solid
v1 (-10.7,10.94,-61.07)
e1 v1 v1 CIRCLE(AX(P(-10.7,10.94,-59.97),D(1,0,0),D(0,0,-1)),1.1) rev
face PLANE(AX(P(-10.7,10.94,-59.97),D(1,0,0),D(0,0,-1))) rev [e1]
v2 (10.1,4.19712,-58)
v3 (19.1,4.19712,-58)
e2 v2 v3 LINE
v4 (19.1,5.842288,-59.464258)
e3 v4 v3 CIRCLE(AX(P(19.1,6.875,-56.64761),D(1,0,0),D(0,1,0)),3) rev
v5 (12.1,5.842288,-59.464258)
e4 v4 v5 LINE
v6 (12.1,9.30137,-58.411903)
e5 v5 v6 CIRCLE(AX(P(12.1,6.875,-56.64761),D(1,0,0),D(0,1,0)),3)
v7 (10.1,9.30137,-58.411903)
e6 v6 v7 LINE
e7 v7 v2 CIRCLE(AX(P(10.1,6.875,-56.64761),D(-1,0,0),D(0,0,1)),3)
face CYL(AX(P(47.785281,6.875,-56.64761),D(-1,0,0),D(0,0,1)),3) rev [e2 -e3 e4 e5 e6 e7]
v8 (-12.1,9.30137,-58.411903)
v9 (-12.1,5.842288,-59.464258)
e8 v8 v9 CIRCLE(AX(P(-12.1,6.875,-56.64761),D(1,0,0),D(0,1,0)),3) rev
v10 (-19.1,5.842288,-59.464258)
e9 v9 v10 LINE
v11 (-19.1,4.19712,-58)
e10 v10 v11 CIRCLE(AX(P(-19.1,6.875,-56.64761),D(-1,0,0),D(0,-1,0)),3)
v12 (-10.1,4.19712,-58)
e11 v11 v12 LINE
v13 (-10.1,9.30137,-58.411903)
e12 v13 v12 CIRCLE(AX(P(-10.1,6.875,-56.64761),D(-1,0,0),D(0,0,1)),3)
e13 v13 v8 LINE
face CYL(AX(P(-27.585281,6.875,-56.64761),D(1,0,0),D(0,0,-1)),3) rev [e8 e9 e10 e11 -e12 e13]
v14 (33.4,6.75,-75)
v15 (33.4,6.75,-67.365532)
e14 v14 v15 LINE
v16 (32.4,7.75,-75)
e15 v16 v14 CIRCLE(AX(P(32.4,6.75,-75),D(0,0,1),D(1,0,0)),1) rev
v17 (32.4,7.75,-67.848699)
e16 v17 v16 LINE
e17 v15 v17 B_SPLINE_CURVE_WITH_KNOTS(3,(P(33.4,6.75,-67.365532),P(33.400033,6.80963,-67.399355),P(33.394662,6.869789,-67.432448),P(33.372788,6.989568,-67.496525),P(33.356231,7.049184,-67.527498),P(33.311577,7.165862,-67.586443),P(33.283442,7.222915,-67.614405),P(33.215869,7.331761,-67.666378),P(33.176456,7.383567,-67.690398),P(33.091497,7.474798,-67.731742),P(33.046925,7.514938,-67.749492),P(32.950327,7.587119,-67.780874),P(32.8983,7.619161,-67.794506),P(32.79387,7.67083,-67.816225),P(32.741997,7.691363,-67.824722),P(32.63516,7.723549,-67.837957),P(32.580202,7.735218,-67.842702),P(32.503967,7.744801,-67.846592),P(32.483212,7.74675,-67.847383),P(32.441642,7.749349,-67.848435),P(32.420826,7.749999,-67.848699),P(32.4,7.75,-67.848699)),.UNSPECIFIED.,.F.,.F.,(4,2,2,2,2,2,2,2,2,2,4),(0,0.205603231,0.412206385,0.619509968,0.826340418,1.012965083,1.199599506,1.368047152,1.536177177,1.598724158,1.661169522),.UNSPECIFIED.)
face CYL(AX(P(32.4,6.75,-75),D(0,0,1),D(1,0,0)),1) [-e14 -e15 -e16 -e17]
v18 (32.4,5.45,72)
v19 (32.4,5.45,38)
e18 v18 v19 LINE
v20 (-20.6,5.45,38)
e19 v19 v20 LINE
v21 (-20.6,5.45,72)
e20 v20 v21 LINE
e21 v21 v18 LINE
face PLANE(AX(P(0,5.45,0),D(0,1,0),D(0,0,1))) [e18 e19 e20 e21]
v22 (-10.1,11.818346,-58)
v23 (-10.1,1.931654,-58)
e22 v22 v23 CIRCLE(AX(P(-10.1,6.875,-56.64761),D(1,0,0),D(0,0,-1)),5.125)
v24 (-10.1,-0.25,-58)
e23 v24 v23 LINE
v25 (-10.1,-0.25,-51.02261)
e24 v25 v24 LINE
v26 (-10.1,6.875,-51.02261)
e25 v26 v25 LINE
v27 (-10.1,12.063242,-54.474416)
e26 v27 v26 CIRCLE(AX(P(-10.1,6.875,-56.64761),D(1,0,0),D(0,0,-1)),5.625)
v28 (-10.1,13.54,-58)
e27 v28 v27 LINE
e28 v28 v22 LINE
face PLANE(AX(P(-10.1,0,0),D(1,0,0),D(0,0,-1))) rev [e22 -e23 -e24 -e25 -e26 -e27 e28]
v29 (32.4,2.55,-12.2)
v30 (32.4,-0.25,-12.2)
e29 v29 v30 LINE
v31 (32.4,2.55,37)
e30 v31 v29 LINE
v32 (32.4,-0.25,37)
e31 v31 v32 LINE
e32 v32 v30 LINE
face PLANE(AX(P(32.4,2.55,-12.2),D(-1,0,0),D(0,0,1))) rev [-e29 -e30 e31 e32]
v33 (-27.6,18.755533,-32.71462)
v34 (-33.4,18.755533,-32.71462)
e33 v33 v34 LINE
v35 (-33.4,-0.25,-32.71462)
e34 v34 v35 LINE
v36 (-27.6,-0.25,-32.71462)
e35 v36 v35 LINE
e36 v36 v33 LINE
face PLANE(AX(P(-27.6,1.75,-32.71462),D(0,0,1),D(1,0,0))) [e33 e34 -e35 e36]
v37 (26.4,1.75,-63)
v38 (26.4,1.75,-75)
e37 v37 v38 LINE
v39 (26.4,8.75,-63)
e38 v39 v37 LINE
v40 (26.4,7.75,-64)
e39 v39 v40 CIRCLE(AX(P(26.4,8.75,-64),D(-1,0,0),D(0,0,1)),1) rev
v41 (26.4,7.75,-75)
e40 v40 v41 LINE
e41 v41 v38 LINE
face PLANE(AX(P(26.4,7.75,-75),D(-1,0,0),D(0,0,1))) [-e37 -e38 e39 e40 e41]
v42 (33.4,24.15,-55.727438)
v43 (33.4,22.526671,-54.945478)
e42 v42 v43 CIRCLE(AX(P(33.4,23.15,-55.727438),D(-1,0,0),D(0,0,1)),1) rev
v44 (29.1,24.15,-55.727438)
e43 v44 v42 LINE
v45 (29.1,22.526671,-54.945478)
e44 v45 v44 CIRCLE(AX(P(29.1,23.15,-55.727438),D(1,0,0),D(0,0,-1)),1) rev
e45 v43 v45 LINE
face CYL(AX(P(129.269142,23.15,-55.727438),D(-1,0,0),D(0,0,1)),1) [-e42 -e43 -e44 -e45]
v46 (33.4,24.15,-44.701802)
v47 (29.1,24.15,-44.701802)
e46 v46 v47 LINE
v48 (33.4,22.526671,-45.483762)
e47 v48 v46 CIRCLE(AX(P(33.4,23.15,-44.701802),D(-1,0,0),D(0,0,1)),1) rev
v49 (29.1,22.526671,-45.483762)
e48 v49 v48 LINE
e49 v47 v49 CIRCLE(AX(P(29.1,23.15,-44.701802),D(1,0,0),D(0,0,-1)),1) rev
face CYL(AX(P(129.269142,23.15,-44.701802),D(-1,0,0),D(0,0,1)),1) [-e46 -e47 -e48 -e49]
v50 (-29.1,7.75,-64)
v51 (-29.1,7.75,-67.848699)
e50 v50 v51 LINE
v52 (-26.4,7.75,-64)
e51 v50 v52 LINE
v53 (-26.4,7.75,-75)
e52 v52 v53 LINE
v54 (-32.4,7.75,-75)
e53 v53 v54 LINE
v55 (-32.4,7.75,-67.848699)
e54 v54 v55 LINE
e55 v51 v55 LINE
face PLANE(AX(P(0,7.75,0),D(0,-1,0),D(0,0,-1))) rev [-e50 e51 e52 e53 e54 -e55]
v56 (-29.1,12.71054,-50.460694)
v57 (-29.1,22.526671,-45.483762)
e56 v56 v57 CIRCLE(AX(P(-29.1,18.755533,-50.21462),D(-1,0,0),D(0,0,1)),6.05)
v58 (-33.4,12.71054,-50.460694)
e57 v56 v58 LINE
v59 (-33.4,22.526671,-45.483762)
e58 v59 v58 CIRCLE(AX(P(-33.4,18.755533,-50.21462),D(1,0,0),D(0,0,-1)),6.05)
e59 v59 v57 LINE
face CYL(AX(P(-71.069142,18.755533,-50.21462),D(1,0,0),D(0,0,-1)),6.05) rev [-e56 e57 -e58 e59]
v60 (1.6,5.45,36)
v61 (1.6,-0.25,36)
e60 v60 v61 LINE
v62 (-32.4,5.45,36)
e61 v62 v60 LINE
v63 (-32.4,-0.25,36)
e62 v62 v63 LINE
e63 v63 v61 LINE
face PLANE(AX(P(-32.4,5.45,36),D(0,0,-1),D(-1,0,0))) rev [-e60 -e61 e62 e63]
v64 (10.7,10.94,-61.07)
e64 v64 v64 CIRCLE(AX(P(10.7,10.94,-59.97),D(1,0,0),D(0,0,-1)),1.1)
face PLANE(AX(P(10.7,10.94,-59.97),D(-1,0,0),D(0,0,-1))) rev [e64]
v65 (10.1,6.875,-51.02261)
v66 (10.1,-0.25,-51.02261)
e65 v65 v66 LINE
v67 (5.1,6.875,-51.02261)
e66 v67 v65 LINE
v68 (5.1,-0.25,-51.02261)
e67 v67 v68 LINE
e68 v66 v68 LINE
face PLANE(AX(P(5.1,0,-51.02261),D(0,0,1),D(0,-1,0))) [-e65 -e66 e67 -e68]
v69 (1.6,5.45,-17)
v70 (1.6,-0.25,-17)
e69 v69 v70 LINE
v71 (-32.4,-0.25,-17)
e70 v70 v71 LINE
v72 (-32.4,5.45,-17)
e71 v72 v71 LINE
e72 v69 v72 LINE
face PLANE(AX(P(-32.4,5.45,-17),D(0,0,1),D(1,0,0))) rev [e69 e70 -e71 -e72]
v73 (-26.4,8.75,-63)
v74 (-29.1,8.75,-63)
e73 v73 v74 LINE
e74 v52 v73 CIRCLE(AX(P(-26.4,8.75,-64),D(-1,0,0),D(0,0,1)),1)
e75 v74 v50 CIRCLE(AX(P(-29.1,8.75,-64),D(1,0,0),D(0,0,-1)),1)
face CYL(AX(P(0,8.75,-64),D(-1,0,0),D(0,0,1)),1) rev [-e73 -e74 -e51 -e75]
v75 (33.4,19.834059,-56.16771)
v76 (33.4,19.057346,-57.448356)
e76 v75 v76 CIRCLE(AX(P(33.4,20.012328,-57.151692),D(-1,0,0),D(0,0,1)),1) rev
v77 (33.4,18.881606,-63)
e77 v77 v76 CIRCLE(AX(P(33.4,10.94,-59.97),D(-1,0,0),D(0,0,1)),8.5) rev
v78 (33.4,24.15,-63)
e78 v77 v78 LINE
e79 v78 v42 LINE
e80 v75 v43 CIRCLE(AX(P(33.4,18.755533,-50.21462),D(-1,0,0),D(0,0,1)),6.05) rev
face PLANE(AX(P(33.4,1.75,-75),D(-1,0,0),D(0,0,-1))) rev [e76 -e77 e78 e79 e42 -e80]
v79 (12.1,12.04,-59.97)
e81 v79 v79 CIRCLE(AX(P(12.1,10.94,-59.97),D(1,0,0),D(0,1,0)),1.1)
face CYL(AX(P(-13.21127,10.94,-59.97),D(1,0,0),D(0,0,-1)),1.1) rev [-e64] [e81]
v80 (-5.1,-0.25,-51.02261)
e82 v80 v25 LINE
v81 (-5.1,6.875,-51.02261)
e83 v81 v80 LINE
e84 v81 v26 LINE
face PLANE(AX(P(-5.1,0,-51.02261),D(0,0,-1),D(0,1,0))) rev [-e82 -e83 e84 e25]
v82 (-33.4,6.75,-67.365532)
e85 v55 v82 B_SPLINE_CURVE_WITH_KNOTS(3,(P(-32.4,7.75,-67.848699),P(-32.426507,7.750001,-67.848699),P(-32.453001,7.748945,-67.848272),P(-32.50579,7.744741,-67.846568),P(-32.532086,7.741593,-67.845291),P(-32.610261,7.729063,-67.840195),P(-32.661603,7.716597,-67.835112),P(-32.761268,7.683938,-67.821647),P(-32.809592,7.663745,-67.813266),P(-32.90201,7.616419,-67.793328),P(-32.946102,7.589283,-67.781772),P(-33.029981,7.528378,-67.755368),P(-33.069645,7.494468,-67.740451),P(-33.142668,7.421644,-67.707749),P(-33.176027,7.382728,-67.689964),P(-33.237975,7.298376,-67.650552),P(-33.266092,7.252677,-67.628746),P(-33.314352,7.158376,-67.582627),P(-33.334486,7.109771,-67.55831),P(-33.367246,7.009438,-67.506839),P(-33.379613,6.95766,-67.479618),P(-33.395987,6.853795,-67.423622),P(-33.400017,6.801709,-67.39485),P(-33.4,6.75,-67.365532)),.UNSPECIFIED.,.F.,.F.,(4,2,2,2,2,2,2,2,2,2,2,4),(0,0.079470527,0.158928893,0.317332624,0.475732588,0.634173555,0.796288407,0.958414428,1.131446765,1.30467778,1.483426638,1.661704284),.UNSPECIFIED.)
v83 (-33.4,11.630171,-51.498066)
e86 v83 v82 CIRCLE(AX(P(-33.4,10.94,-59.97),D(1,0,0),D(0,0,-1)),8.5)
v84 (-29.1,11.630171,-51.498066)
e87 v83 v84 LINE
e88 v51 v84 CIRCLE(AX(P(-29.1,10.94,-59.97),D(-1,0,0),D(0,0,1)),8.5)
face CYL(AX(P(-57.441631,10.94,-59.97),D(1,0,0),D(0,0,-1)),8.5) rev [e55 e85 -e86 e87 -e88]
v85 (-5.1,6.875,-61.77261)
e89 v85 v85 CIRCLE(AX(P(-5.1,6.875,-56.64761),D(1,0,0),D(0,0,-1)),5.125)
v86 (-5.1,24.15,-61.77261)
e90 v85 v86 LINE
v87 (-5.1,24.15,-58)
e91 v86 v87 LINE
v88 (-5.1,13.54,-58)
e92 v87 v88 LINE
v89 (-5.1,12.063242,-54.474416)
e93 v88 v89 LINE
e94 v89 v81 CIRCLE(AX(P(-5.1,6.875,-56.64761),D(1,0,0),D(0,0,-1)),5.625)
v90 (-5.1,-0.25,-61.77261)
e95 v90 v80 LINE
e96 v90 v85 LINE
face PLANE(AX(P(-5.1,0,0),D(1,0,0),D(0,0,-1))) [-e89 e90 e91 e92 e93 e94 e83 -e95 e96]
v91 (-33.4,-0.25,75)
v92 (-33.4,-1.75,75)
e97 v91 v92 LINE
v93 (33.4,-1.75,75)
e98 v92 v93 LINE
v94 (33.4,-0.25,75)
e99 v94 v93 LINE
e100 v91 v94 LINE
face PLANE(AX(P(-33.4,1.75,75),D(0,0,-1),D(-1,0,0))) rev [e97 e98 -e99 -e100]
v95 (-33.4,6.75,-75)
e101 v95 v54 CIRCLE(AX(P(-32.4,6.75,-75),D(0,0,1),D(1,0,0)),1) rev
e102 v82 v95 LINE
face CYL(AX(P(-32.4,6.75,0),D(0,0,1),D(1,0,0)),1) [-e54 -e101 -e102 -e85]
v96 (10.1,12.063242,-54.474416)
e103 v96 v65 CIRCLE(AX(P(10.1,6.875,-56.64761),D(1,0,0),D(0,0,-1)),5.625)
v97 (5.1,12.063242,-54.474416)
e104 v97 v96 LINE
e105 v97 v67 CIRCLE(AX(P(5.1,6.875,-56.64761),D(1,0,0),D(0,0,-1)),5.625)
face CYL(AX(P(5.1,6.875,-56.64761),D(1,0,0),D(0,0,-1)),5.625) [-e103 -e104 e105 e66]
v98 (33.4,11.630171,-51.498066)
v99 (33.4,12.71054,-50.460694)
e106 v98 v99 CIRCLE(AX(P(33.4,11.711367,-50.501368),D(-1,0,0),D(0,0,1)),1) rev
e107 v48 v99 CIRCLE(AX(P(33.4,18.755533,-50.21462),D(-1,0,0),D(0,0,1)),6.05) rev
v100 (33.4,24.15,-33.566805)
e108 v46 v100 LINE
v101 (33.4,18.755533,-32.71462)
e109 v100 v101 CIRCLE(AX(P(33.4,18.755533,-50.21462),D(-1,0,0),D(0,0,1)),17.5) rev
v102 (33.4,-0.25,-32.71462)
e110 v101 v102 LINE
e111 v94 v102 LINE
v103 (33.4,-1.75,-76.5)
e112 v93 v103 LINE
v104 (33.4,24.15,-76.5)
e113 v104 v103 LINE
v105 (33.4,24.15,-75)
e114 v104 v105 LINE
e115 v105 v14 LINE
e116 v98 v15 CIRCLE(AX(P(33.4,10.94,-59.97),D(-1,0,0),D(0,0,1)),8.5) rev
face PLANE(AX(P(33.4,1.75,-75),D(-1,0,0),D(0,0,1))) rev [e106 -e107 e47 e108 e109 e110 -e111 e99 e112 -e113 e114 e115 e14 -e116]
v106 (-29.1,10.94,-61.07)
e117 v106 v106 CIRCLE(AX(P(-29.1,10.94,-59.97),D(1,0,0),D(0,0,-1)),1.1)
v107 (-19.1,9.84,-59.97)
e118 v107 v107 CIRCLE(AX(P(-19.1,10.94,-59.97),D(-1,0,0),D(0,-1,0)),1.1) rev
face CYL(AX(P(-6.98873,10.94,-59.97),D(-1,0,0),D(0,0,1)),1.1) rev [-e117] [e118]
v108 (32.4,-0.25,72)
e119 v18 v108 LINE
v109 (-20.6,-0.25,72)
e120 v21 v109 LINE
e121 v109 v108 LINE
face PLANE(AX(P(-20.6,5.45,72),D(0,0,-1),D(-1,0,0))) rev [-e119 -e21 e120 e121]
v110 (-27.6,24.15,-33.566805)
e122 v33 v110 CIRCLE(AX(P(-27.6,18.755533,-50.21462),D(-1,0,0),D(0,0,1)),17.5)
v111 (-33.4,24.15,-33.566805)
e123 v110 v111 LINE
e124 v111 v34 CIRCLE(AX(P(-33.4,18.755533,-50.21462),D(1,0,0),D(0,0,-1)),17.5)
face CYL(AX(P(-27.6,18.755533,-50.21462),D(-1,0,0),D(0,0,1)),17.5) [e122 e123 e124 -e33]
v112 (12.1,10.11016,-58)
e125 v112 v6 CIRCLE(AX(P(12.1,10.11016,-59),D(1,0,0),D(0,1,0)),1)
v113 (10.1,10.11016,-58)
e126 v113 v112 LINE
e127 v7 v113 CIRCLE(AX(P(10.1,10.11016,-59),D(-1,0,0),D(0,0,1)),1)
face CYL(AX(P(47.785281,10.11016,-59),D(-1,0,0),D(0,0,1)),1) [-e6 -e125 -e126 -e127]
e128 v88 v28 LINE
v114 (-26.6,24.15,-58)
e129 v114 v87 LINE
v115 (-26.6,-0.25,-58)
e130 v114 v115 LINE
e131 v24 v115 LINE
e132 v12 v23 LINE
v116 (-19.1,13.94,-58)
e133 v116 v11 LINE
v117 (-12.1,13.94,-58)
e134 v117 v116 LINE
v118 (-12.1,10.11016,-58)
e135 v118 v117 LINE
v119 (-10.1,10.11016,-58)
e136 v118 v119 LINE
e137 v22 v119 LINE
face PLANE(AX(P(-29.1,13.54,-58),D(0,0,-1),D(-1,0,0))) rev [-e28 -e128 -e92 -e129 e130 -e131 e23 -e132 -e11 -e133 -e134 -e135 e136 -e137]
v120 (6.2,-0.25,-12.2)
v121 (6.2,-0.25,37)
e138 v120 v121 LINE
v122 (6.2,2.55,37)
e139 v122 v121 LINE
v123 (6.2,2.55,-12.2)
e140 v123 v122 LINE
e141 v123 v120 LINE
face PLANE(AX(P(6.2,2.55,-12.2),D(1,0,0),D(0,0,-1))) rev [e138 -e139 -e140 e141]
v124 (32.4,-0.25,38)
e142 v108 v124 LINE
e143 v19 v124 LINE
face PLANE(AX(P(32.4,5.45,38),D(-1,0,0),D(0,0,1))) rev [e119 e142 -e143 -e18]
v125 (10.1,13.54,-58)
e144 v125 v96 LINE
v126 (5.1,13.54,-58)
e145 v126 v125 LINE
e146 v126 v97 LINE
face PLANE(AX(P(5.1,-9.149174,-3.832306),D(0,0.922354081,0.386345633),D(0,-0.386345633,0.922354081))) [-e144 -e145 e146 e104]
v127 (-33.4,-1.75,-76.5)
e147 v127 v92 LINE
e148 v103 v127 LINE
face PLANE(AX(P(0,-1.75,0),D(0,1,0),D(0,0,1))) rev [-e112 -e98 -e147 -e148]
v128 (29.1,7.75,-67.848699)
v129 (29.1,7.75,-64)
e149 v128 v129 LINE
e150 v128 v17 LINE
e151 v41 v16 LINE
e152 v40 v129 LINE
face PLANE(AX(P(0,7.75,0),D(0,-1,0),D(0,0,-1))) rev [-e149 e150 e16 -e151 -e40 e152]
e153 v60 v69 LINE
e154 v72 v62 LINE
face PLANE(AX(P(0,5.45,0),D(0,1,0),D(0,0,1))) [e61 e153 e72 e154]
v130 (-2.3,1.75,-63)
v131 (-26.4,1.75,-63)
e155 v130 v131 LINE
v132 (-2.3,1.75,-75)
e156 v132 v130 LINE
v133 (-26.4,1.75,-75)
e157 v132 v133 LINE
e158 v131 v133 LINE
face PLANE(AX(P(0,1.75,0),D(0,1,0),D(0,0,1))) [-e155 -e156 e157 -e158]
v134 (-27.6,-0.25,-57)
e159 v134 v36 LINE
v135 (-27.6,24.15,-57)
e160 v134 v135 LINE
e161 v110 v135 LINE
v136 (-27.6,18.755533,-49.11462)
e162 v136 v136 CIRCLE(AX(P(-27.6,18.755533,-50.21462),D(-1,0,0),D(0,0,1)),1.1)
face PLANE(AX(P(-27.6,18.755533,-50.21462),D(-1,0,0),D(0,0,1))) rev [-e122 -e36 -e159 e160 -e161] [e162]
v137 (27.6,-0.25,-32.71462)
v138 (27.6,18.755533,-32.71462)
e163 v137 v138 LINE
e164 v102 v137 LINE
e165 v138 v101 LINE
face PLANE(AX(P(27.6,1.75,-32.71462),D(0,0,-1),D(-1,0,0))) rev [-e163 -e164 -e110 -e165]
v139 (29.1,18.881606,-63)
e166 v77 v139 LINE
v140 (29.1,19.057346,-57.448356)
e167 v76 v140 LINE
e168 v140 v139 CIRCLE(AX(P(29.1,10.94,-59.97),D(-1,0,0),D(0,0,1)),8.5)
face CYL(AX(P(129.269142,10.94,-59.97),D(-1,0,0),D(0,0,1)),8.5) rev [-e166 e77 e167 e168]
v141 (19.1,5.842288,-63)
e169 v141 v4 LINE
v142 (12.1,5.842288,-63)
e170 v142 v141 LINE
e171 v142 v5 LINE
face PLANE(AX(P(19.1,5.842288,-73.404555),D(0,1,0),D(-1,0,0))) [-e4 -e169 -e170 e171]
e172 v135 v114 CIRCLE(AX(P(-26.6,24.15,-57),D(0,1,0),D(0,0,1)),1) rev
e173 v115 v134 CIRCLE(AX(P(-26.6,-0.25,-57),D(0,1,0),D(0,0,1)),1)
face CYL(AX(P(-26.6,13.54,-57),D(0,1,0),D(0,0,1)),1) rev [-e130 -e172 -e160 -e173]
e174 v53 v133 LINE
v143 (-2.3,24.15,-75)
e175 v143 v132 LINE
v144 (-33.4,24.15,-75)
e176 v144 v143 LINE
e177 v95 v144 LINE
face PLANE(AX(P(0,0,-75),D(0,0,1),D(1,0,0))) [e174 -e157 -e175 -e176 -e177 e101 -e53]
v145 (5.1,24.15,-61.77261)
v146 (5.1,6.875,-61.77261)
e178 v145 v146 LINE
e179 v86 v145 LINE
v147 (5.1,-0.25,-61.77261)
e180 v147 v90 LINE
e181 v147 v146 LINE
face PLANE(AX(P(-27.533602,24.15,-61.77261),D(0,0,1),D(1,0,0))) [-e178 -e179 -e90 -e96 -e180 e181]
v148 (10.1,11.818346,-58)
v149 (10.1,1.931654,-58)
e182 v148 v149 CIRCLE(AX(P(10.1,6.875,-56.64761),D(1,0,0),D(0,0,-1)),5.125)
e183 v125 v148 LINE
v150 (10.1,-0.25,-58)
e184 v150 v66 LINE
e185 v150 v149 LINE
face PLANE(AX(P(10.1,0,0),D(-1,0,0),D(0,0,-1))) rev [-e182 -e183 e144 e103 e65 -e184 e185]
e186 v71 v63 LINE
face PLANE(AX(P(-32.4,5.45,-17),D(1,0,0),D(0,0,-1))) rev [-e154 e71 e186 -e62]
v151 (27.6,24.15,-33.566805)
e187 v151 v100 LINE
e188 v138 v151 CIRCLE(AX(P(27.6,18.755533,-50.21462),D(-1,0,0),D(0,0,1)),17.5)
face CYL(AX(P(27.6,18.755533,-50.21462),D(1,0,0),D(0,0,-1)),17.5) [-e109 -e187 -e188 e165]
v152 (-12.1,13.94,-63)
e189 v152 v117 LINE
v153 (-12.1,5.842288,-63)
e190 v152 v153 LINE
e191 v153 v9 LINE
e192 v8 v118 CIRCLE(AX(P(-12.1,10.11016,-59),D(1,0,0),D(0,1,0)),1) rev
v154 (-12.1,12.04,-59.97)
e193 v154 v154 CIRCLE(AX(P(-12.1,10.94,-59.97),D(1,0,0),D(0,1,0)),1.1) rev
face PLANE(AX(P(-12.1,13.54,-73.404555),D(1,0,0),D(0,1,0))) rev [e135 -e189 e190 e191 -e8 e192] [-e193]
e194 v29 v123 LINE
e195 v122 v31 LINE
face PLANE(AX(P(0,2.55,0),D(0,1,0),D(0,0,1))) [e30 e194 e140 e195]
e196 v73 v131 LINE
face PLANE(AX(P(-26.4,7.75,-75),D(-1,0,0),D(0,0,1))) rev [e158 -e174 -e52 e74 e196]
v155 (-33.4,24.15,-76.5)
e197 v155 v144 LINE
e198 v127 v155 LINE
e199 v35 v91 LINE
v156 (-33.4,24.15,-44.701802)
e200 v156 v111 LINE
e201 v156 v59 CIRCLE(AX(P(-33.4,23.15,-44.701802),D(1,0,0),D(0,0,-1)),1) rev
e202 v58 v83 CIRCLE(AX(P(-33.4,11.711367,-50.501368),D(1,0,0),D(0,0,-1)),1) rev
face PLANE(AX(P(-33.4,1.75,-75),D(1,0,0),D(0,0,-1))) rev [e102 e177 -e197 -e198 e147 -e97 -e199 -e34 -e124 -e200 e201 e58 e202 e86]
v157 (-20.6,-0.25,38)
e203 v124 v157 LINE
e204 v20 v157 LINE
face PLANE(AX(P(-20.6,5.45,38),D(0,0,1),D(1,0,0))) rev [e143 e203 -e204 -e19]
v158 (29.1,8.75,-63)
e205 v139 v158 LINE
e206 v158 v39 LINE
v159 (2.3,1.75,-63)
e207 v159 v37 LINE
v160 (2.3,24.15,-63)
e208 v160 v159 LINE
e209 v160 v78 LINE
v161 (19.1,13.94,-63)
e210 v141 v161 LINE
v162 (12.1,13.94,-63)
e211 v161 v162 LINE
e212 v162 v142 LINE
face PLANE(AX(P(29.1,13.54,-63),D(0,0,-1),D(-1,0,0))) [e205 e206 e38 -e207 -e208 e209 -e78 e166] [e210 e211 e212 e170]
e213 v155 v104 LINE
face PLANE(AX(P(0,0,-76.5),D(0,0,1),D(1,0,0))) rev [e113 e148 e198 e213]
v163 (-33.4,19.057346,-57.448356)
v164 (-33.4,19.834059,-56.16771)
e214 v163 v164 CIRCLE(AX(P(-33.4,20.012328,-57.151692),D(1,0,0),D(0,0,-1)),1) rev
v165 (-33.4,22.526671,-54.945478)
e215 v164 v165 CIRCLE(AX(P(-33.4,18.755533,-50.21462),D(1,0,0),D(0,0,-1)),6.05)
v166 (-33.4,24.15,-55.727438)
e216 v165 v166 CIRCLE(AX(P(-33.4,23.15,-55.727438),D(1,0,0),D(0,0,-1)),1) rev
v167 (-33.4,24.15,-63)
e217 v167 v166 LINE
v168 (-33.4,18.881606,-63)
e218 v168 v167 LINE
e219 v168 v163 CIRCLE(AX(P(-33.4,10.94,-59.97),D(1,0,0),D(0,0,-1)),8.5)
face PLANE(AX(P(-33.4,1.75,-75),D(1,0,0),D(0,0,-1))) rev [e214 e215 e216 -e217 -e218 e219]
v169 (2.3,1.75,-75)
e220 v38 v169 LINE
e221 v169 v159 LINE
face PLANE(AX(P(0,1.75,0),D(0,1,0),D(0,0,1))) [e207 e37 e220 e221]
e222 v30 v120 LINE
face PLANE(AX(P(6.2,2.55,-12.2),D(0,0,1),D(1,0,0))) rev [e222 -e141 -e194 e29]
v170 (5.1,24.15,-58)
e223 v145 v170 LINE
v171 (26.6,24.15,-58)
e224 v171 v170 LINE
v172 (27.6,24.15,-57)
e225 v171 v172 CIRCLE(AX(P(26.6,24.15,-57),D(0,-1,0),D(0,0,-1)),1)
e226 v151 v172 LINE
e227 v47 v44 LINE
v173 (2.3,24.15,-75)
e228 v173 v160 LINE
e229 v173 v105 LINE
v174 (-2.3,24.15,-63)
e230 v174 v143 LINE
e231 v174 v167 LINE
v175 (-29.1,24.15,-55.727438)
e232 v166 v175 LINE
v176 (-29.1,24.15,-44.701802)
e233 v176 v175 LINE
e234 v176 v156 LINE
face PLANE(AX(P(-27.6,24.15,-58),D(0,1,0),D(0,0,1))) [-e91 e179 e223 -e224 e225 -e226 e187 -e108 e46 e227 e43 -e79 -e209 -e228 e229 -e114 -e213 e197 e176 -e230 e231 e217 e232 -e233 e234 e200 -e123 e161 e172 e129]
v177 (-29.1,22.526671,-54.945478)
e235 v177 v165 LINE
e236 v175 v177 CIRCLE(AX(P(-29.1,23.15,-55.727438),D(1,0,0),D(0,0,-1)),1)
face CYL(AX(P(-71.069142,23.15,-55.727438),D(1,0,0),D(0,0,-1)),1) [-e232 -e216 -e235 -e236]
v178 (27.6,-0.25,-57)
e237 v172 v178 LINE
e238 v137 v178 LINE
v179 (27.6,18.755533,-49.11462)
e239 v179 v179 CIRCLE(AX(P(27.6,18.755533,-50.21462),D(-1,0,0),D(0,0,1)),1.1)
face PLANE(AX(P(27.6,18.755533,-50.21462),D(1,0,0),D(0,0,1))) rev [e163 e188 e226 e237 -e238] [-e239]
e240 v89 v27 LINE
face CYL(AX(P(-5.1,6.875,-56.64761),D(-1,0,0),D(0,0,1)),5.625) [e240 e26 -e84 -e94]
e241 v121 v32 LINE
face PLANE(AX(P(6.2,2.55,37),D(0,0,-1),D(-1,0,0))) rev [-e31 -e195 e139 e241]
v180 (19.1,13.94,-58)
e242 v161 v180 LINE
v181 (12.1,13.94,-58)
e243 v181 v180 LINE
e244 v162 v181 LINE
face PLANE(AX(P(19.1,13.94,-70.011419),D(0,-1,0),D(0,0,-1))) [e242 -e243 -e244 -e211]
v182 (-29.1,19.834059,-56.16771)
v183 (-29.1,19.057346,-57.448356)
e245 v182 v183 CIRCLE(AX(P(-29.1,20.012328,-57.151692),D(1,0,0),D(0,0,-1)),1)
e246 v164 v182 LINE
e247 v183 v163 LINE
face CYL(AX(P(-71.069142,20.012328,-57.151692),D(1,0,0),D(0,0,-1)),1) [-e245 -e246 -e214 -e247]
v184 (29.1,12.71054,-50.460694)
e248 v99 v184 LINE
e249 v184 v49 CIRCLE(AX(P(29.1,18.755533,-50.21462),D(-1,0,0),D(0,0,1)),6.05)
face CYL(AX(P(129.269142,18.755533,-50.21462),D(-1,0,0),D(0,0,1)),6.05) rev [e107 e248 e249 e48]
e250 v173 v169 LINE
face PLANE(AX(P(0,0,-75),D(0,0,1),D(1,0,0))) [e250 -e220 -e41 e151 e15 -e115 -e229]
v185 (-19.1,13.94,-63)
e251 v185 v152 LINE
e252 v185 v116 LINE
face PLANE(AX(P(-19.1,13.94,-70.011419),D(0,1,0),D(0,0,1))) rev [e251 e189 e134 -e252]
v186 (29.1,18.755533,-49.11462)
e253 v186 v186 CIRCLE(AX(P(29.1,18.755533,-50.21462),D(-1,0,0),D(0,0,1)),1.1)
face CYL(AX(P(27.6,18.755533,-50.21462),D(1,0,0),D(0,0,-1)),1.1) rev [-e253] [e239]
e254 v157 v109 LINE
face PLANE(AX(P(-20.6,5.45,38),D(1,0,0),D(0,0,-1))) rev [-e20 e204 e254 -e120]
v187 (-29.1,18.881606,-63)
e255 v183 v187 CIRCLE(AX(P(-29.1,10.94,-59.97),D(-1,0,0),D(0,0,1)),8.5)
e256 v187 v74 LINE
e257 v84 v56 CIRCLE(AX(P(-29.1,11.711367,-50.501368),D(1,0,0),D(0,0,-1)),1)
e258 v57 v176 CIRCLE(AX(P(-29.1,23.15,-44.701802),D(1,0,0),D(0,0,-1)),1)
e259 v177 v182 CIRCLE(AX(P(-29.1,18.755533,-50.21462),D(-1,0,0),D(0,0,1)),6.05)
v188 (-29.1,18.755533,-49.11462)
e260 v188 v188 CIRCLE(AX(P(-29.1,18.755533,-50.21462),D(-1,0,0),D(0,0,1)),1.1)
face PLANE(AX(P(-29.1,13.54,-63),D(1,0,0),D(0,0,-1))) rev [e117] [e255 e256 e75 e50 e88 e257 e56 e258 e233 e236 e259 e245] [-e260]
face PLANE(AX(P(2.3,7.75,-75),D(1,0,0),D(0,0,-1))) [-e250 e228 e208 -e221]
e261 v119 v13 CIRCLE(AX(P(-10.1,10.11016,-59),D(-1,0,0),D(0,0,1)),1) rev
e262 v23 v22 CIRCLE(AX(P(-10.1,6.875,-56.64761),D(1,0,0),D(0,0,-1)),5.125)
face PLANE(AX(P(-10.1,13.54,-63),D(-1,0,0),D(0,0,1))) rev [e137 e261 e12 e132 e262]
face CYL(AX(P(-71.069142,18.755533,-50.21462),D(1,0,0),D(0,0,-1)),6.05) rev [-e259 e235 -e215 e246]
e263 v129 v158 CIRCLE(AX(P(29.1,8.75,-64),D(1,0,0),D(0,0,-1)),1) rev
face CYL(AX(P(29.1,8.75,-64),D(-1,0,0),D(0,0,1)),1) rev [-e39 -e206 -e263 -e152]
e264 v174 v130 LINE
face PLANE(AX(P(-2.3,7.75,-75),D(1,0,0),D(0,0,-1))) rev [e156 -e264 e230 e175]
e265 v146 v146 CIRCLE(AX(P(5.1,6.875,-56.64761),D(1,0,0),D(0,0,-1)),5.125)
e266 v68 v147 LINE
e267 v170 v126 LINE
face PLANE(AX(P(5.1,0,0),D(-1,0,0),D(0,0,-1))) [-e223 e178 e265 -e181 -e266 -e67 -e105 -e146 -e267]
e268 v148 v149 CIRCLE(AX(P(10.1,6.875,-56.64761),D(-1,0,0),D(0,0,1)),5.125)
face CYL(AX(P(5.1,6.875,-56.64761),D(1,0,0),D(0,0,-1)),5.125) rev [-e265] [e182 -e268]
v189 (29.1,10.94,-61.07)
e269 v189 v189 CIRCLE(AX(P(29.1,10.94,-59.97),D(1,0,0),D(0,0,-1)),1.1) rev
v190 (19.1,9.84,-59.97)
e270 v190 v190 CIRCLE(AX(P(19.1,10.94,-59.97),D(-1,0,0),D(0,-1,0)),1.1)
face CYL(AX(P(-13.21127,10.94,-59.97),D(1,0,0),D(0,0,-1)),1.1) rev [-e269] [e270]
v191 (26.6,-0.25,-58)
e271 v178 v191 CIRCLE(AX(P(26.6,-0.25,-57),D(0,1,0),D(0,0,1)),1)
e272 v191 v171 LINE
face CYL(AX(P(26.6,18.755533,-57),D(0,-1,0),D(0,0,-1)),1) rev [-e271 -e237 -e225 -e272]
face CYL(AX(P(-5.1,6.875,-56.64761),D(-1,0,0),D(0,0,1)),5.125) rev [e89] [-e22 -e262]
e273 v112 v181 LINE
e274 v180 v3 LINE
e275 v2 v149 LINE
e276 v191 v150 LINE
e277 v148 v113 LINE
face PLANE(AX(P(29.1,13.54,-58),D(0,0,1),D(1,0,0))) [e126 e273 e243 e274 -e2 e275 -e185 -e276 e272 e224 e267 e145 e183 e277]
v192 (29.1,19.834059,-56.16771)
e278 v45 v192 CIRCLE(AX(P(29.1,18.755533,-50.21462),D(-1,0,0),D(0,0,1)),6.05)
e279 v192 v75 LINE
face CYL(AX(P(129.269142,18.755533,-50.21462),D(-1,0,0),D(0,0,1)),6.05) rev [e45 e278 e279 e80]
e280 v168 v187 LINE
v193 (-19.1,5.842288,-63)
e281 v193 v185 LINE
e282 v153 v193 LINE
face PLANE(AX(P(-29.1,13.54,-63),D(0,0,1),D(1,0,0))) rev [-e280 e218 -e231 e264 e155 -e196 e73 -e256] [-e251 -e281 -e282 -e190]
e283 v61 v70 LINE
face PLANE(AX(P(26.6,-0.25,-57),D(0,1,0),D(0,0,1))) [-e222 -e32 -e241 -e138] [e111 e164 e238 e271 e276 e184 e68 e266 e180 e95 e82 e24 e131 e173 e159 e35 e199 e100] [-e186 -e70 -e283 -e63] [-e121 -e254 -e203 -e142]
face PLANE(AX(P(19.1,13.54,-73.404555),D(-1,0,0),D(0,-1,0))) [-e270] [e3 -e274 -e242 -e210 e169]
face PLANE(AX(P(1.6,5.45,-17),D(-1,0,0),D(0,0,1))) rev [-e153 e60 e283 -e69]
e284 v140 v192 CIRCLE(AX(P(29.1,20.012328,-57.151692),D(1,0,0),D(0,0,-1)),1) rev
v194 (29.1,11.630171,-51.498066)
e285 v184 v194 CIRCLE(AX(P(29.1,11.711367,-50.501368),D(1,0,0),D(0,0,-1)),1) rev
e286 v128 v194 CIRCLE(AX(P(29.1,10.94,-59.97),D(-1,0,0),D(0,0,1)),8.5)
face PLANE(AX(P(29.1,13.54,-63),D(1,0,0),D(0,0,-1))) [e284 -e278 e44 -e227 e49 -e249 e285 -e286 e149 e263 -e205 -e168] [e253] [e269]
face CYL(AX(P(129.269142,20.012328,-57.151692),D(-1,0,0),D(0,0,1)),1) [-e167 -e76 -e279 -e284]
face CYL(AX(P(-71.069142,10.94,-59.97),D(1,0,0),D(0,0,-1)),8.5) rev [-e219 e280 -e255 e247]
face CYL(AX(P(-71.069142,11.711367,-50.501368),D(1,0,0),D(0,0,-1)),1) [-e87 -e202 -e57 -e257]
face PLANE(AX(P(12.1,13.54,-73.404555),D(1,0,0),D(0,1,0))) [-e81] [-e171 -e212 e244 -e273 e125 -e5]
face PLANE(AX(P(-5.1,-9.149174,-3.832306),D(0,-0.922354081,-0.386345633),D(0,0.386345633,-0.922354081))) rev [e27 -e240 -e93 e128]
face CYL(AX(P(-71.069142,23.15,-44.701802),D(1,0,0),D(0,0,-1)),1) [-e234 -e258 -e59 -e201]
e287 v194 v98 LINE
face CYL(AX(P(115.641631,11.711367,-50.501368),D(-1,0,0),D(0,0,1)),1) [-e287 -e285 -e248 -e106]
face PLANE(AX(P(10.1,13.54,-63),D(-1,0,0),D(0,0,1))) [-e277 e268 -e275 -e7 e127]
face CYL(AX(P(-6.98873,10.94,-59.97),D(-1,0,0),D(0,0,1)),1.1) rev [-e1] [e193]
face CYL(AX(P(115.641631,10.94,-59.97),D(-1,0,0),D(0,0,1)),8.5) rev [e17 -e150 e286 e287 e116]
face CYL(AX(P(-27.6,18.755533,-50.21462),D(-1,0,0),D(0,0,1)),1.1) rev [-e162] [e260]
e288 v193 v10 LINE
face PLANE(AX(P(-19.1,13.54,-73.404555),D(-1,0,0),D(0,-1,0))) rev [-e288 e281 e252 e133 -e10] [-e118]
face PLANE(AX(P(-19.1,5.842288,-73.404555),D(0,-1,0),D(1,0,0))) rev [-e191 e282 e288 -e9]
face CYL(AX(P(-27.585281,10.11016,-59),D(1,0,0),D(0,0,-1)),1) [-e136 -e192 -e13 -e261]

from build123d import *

# Parameters (mm, degrees)
SKETCH1_W            = 66.8
SKETCH1_H            = 150
BOSS_EXTRUDE1_DEPTH  = 1.75
SKETCH2_W            = 7
SKETCH2_H            = 12
SKETCH2_W_2          = 2.3
BOSS_EXTRUDE2_DEPTH  = 6
SKETCH3_W            = 19
SKETCH3_H            = 5
BOSS_EXTRUDE3_DEPTH  = 11.79
SKETCH4_R            = 1.1
CUT_EXTRUDE1_DEPTH   = 23.3
SKETCH33_R           = 1.1
BOSS_EXTRUDE21_DEPTH = 1.5
SKETCH8_R            = 8.5
CUT_EXTRUDE3_DEPTH   = 4.3
SKETCH5_W            = 7
SKETCH5_H            = 7.697712298
CUT_EXTRUDE4_DEPTH   = 5
BOSS_EXTRUDE6_DEPTH  = 5
BOSS_EXTRUDE23_DEPTH = 4.3
CUT_EXTRUDE6_REACH   = 92.003
SKETCH36_R           = 3
SKETCH34_W           = 10
SKETCH34_H           = 5
BOSS_EXTRUDE24_DEPTH = 10.61
BOSS_EXTRUDE25_DEPTH = 4.3
BOSS_EXTRUDE26_DEPTH = 5
FILLET7_R            = 1
SKETCH44_W           = 5
SKETCH44_H           = 10.61
BOSS_EXTRUDE30_DEPTH = 14
SKETCH45_W           = 7
SKETCH45_H           = 0.4
CUT_EXTRUDE8_DEPTH   = 5
FILLET7_OF_MIRROR5_R = 1
SKETCH30_R           = 1.1
BOSS_EXTRUDE19_DEPTH = 0.6
SKETCH28_W           = 4.6
SKETCH28_H           = 12
BOSS_EXTRUDE31_DEPTH = 16.4
SKETCH47_W           = 66.8
SKETCH47_H           = 25.9
BOSS_EXTRUDE32_DEPTH = 1.5
SKETCH50_W           = 1.227389953
SKETCH50_H           = 22.4
BOSS_EXTRUDE33_DEPTH = 10.2
CUT_EXTRUDE9_DEPTH   = 2
SKETCH52_W           = 34
SKETCH52_H           = 53
SKETCH52_W_2         = 53
SKETCH52_H_2         = 34
BOSS_EXTRUDE34_DEPTH = 5.7
SKETCH53_W           = 26.2
SKETCH53_H           = 49.2
BOSS_EXTRUDE35_DEPTH = 2.8


# Read off the part's stored shape, not the designer's step: Boss-Extrude6
with BuildPart() as part:
    # Sketch1 → Boss-Extrude1 (new, symmetric)
    with BuildSketch(Plane(origin=(0, 0, 0), x_dir=(1, 0, 0), z_dir=(0, 1, 0))):
        Rectangle(SKETCH1_W, SKETCH1_H)
    boss_extrude1 = extrude(amount=BOSS_EXTRUDE1_DEPTH, both=True)

    # Sketch2 → Boss-Extrude2 (add)
    with BuildSketch(Plane(origin=(0, 1.75, 0), x_dir=(1, 0, 0), z_dir=(0, 1, 0))):
        with Locations((-29.9, 69)):
            Rectangle(SKETCH2_W, SKETCH2_H)
        with Locations((-1.15, 69)):
            Rectangle(SKETCH2_W_2, SKETCH2_H)
    boss_extrude2 = extrude(amount=BOSS_EXTRUDE2_DEPTH)

    # Sketch3 → Boss-Extrude3 (add)
    with BuildSketch(Plane(origin=(0, 1.75, 0), x_dir=(1, 0, 0), z_dir=(0, 1, 0))):
        with Locations((-19.6, 60.5)):
            Rectangle(SKETCH3_W, SKETCH3_H)
    boss_extrude3 = extrude(amount=BOSS_EXTRUDE3_DEPTH)

    # Sketch4 → Cut-Extrude1 (cut)
    with BuildSketch(Plane.ZY.offset(33.4)):
        with Locations((-59.97, 10.94)):
            Circle(SKETCH4_R)
    cut_extrude1 = extrude(amount=-CUT_EXTRUDE1_DEPTH, mode=Mode.SUBTRACT)

    # Sketch33 → Boss-Extrude21 (add)
    with BuildSketch(Plane.ZY.offset(29.1)):
        with BuildLine():
            Line((-58, 1.75), (-32.714619908, 1.75))
            Line((-32.714619908, 1.75), (-32.714619908, 18.755533204))
            ThreePointArc((-32.714619908, 18.755533204), (-32.928979134, 21.486214993), (-33.566805397, 24.15))
            Line((-33.566805397, 24.15), (-58, 24.15))
            Line((-58, 24.15), (-58, 1.75))
        make_face()
        with Locations((-50.214619908, 18.755533204)):
            Circle(SKETCH33_R, mode=Mode.SUBTRACT)
    boss_extrude21 = extrude(amount=-BOSS_EXTRUDE21_DEPTH)

    # Sketch8 → Cut-Extrude3 (cut)
    with BuildSketch(Plane.ZY.offset(29.1)):
        with Locations((-59.97, 10.94)):
            Circle(SKETCH8_R)
    cut_extrude3 = extrude(amount=CUT_EXTRUDE3_DEPTH, mode=Mode.SUBTRACT)

    # Sketch5 → Cut-Extrude4 (cut)
    with BuildSketch(Plane.XY.offset(-58)):
        with Locations((-15.6, 9.691143851)):
            Rectangle(SKETCH5_W, SKETCH5_H)
    cut_extrude4 = extrude(amount=-CUT_EXTRUDE4_DEPTH, mode=Mode.SUBTRACT)

    # Boss-Extrude6 outline → Boss-Extrude6 (add)
    with BuildSketch(Plane(origin=(-10.1, 0, 0), x_dir=(0, 0, -1), z_dir=(1, 0, 0))):
        with BuildLine():
            Line((63, 1.75), (63, 13.54))
            Line((63, 13.54), (58, 13.54))
            Line((58, 13.54), (54.474415859, 12.063241708))
            ThreePointArc((54.474415859, 12.063241708), (51.964403757, 9.99079907), (51.022610047, 6.875))
            Line((51.022610047, 6.875), (51.022610047, 1.75))
            Line((51.022610047, 1.75), (56.647610047, 1.75))
            ThreePointArc((56.647610047, 1.75), (55.965342342, 11.954383405), (58, 1.93165433))
            Line((58, 1.93165433), (58, 1.75))
            Line((58, 1.75), (63, 1.75))
        make_face()
    boss_extrude6 = extrude(amount=BOSS_EXTRUDE6_DEPTH)

    # Sketch35 → Boss-Extrude23 (add)
    with BuildSketch(Plane.ZY.offset(29.1)):
        with BuildLine():
            ThreePointArc((-51.696668378, 12.889867655), (-54.372371702, 4.543394851), (-63, 2.998394369))
            Line((-63, 2.998394369), (-63, 1.75))
            Line((-63, 1.75), (-32.714619908, 1.75))
            Line((-32.714619908, 1.75), (-32.714619908, 18.755533204))
            ThreePointArc((-32.714619908, 18.755533204), (-32.928979134, 21.486214993), (-33.566805397, 24.15))
            Line((-33.566805397, 24.15), (-47.475600378, 24.15))
            ThreePointArc((-47.475600378, 24.15), (-44.549583353, 16.631889912), (-51.696668378, 12.889867655))
        make_face()
        with BuildLine():
            ThreePointArc((-58, 19.208560939), (-57.114293593, 18.945931608), (-56.262320095, 18.588732556))
            ThreePointArc((-56.262320095, 18.588732556), (-55.413998212, 21.848907617), (-52.953639439, 24.15))
            Line((-52.953639439, 24.15), (-58, 24.15))
            Line((-58, 24.15), (-58, 19.208560939))
        make_face()
    boss_extrude23 = extrude(amount=BOSS_EXTRUDE23_DEPTH)

    # Cut-Extrude6: up to this face of the body (flat: up to its plane)
    cut_extrude6_end = Plane(part.part.faces().sort_by_distance((-19.1, 9.554283394, -60.558081983))[0])
    # Sketch36 → Cut-Extrude6 (cut, up to the picked face)
    with BuildSketch(Plane.ZY.offset(10.1), mode=Mode.PRIVATE) as cut_extrude6_sk1:
        with Locations((-56.647610047, 6.875)):
            Circle(SKETCH36_R)
    cut_extrude6_tool1 = split(extrude(cut_extrude6_sk1.sketch, amount=CUT_EXTRUDE6_REACH, mode=Mode.PRIVATE), bisect_by=cut_extrude6_end, keep=Keep.BOTH, mode=Mode.PRIVATE)
    cut_extrude6 = cut_extrude6_tool1.solids().sort_by(Axis((-10.1, 6.875, -56.64761), (-1, 0, 0)))[0]
    add(cut_extrude6, mode=Mode.SUBTRACT)

    # Sketch34 → Boss-Extrude24 (add)
    with BuildSketch(Plane(origin=(0, 13.54, 0), x_dir=(1, 0, 0), z_dir=(0, 1, 0))):
        with Locations((-24.1, 60.5)):
            Rectangle(SKETCH34_W, SKETCH34_H)
    boss_extrude24 = extrude(amount=BOSS_EXTRUDE24_DEPTH)

    # Sketch37 → Boss-Extrude25 (add)
    with BuildSketch(Plane.ZY.offset(29.1)):
        with BuildLine():
            Line((-58, 24.15), (-63, 24.15))
            Line((-63, 24.15), (-63, 18.881605631))
            ThreePointArc((-63, 18.881605631), (-60.524639471, 19.421885112), (-58, 19.208560939))
            Line((-58, 19.208560939), (-58, 24.15))
        make_face()
    boss_extrude25 = extrude(amount=BOSS_EXTRUDE25_DEPTH)

    # Sketch38 → Boss-Extrude26 (add)
    with BuildSketch(Plane.ZY.offset(10.1)):
        with BuildLine():
            Line((-56.647610047, 1.75), (-58.2, 1.75))
            Line((-58.2, 1.75), (-58.2, 1.99076921))
            ThreePointArc((-58.2, 1.99076921), (-57.433085123, 1.810549991), (-56.647610047, 1.75))
        make_face()
    boss_extrude26 = extrude(amount=-BOSS_EXTRUDE26_DEPTH)

    # Fillet7
    fillet7_edges = [part.edges().sort_by_distance(p)[0] for p in [
        (-31.25, 12.889867655, -51.696668378),
        (-31.25, 24.15, -47.475600378),
        (-31.25, 18.588732556, -56.262320095),
        (-31.25, 24.15, -52.953639439),
        (-11.1, 9.552880023, -58),
        (-33.4, 7.75, -71.424349566),
        (-27.75, 7.75, -63),
        (-27.6, 12.95, -58),
    ]]
    fillet(fillet7_edges, radius=FILLET7_R)

    # Sketch44 → Boss-Extrude30 (add)
    with BuildSketch(Plane(origin=(-19.1, 0, 0), x_dir=(0, 0, -1), z_dir=(1, 0, 0))):
        with Locations((60.5, 18.845)):
            Rectangle(SKETCH44_W, SKETCH44_H)
    boss_extrude30 = extrude(amount=BOSS_EXTRUDE30_DEPTH)

    # Sketch45 → Cut-Extrude8 (cut)
    with BuildSketch(Plane.XY.offset(-58)):
        with Locations((-15.6, 13.74)):
            Rectangle(SKETCH45_W, SKETCH45_H)
    cut_extrude8 = extrude(amount=-CUT_EXTRUDE8_DEPTH, mode=Mode.SUBTRACT)

    # Mirror5: Boss-Extrude1, Boss-Extrude2, Boss-Extrude3, Cut-Extrude1, Boss-Extrude21, Cut-Extrude3, Cut-Extrude4, Boss-Extrude6, Boss-Extrude23, Cut-Extrude6, Boss-Extrude24, Boss-Extrude25, Boss-Extrude26, Boss-Extrude30, Cut-Extrude8 across plane
    add(boss_extrude1.mirror(Plane(origin=(0, 0, 0), x_dir=(0, 0, 1), z_dir=(1, 0, 0))))
    add(boss_extrude2.mirror(Plane(origin=(0, 0, 0), x_dir=(0, 0, 1), z_dir=(1, 0, 0))))
    add(boss_extrude3.mirror(Plane(origin=(0, 0, 0), x_dir=(0, 0, 1), z_dir=(1, 0, 0))))
    add(cut_extrude1.mirror(Plane(origin=(0, 0, 0), x_dir=(0, 0, 1), z_dir=(1, 0, 0))), mode=Mode.SUBTRACT)
    add(boss_extrude21.mirror(Plane(origin=(0, 0, 0), x_dir=(0, 0, 1), z_dir=(1, 0, 0))))
    add(cut_extrude3.mirror(Plane(origin=(0, 0, 0), x_dir=(0, 0, 1), z_dir=(1, 0, 0))), mode=Mode.SUBTRACT)
    add(cut_extrude4.mirror(Plane(origin=(0, 0, 0), x_dir=(0, 0, 1), z_dir=(1, 0, 0))), mode=Mode.SUBTRACT)
    add(boss_extrude6.mirror(Plane(origin=(0, 0, 0), x_dir=(0, 0, 1), z_dir=(1, 0, 0))))
    add(boss_extrude23.mirror(Plane(origin=(0, 0, 0), x_dir=(0, 0, 1), z_dir=(1, 0, 0))))
    add(cut_extrude6.mirror(Plane(origin=(0, 0, 0), x_dir=(0, 0, 1), z_dir=(1, 0, 0))), mode=Mode.SUBTRACT)
    add(boss_extrude24.mirror(Plane(origin=(0, 0, 0), x_dir=(0, 0, 1), z_dir=(1, 0, 0))))
    add(boss_extrude25.mirror(Plane(origin=(0, 0, 0), x_dir=(0, 0, 1), z_dir=(1, 0, 0))))
    add(boss_extrude26.mirror(Plane(origin=(0, 0, 0), x_dir=(0, 0, 1), z_dir=(1, 0, 0))))
    add(boss_extrude30.mirror(Plane(origin=(0, 0, 0), x_dir=(0, 0, 1), z_dir=(1, 0, 0))))
    add(cut_extrude8.mirror(Plane(origin=(0, 0, 0), x_dir=(0, 0, 1), z_dir=(1, 0, 0))), mode=Mode.SUBTRACT)

    # Fillet7 of Mirror5
    fillet7_of_mirror5_edges = [part.edges().sort_by_distance(p)[0] for p in [
        (31.25, 12.889867655, -51.696668378),
        (31.25, 24.15, -47.475600378),
        (31.25, 18.588732556, -56.262320095),
        (31.25, 24.15, -52.953639439),
        (11.1, 9.552880023, -58),
        (33.4, 7.75, -71.424349566),
        (27.75, 7.75, -63),
        (27.6, 12.95, -58),
    ]]
    fillet(fillet7_of_mirror5_edges, radius=FILLET7_OF_MIRROR5_R)

    # Sketch30 → Boss-Extrude19 (add)
    with BuildSketch(Plane(origin=(-10.1, 0, 0), x_dir=(0, 0, -1), z_dir=(1, 0, 0))):
        with Locations(Location((59.97, 10.94, 0), (0, 0, 90))):
            Circle(SKETCH30_R)
    boss_extrude19 = extrude(amount=-BOSS_EXTRUDE19_DEPTH)

    # Mirror6: Boss-Extrude19 across plane
    add(boss_extrude19.mirror(Plane(origin=(0, 0, 0), x_dir=(0, 0, 1), z_dir=(1, 0, 0))))

    # Sketch28 → Boss-Extrude31 (add)
    with BuildSketch(Plane(origin=(0, 7.75, 0), x_dir=(1, 0, 0), z_dir=(0, 1, 0))):
        with Locations((0, 69)):
            Rectangle(SKETCH28_W, SKETCH28_H)
    extrude(amount=BOSS_EXTRUDE31_DEPTH)

    # Sketch47 → Boss-Extrude32 (add)
    with BuildSketch(Plane(origin=(0, 0, -75), x_dir=(-1, 0, 0), z_dir=(0, 0, -1))):
        with Locations((0, 11.2)):
            Rectangle(SKETCH47_W, SKETCH47_H)
    extrude(amount=BOSS_EXTRUDE32_DEPTH)

    # Sketch50 → Boss-Extrude33 (add)
    with BuildSketch(Plane.ZY.offset(-5.1)):
        with Locations((-62.386305024, 12.95)):
            Rectangle(SKETCH50_W, SKETCH50_H)
    extrude(amount=BOSS_EXTRUDE33_DEPTH)

    # Sketch51 → Cut-Extrude9 (cut)
    with BuildSketch(Plane(origin=(0, 1.75, 0), x_dir=(1, 0, 0), z_dir=(0, 1, 0))):
        with BuildLine():
            Line((-33.4, 32.714619908), (-33.4, -75))
            Line((-33.4, -75), (33.4, -75))
            Line((33.4, -75), (33.4, 32.714619908))
            Line((33.4, 32.714619908), (27.6, 32.714619908))
            Line((27.6, 32.714619908), (27.6, 57))
            ThreePointArc((27.6, 57), (27.307106781, 57.707106781), (26.6, 58))
            Line((26.6, 58), (10.1, 58))
            Line((10.1, 58), (10.1, 56.647610047))
            Line((10.1, 56.647610047), (10.1, 51.022610047))
            Line((10.1, 51.022610047), (5.1, 51.022610047))
            Line((5.1, 51.022610047), (5.1, 56.647610047))
            Line((5.1, 56.647610047), (5.1, 61.772610047))
            Line((5.1, 61.772610047), (-5.1, 61.772610047))
            Line((-5.1, 61.772610047), (-5.1, 56.647610047))
            Line((-5.1, 56.647610047), (-5.1, 51.022610047))
            Line((-5.1, 51.022610047), (-10.1, 51.022610047))
            Line((-10.1, 51.022610047), (-10.1, 56.647610047))
            Line((-10.1, 56.647610047), (-10.1, 58))
            Line((-10.1, 58), (-26.6, 58))
            ThreePointArc((-26.6, 58), (-27.307106781, 57.707106781), (-27.6, 57))
            Line((-27.6, 57), (-27.6, 32.714619908))
            Line((-27.6, 32.714619908), (-33.4, 32.714619908))
        make_face()
    extrude(amount=-CUT_EXTRUDE9_DEPTH, mode=Mode.SUBTRACT)

    # Sketch52 → Boss-Extrude34 (add)
    with BuildSketch(Plane(origin=(0, -0.25, 0), x_dir=(1, 0, 0), z_dir=(0, 1, 0))):
        with Locations((-15.4, -9.5)):
            Rectangle(SKETCH52_W, SKETCH52_H)
        with Locations((5.9, -55)):
            Rectangle(SKETCH52_W_2, SKETCH52_H_2)
    extrude(amount=BOSS_EXTRUDE34_DEPTH)

    # Sketch53 → Boss-Extrude35 (add)
    with BuildSketch(Plane(origin=(0, -0.25, 0), x_dir=(1, 0, 0), z_dir=(0, 1, 0))):
        with Locations((19.3, -12.4)):
            Rectangle(SKETCH53_W, SKETCH53_H)
    extrude(amount=BOSS_EXTRUDE35_DEPTH)


solid = part.part
